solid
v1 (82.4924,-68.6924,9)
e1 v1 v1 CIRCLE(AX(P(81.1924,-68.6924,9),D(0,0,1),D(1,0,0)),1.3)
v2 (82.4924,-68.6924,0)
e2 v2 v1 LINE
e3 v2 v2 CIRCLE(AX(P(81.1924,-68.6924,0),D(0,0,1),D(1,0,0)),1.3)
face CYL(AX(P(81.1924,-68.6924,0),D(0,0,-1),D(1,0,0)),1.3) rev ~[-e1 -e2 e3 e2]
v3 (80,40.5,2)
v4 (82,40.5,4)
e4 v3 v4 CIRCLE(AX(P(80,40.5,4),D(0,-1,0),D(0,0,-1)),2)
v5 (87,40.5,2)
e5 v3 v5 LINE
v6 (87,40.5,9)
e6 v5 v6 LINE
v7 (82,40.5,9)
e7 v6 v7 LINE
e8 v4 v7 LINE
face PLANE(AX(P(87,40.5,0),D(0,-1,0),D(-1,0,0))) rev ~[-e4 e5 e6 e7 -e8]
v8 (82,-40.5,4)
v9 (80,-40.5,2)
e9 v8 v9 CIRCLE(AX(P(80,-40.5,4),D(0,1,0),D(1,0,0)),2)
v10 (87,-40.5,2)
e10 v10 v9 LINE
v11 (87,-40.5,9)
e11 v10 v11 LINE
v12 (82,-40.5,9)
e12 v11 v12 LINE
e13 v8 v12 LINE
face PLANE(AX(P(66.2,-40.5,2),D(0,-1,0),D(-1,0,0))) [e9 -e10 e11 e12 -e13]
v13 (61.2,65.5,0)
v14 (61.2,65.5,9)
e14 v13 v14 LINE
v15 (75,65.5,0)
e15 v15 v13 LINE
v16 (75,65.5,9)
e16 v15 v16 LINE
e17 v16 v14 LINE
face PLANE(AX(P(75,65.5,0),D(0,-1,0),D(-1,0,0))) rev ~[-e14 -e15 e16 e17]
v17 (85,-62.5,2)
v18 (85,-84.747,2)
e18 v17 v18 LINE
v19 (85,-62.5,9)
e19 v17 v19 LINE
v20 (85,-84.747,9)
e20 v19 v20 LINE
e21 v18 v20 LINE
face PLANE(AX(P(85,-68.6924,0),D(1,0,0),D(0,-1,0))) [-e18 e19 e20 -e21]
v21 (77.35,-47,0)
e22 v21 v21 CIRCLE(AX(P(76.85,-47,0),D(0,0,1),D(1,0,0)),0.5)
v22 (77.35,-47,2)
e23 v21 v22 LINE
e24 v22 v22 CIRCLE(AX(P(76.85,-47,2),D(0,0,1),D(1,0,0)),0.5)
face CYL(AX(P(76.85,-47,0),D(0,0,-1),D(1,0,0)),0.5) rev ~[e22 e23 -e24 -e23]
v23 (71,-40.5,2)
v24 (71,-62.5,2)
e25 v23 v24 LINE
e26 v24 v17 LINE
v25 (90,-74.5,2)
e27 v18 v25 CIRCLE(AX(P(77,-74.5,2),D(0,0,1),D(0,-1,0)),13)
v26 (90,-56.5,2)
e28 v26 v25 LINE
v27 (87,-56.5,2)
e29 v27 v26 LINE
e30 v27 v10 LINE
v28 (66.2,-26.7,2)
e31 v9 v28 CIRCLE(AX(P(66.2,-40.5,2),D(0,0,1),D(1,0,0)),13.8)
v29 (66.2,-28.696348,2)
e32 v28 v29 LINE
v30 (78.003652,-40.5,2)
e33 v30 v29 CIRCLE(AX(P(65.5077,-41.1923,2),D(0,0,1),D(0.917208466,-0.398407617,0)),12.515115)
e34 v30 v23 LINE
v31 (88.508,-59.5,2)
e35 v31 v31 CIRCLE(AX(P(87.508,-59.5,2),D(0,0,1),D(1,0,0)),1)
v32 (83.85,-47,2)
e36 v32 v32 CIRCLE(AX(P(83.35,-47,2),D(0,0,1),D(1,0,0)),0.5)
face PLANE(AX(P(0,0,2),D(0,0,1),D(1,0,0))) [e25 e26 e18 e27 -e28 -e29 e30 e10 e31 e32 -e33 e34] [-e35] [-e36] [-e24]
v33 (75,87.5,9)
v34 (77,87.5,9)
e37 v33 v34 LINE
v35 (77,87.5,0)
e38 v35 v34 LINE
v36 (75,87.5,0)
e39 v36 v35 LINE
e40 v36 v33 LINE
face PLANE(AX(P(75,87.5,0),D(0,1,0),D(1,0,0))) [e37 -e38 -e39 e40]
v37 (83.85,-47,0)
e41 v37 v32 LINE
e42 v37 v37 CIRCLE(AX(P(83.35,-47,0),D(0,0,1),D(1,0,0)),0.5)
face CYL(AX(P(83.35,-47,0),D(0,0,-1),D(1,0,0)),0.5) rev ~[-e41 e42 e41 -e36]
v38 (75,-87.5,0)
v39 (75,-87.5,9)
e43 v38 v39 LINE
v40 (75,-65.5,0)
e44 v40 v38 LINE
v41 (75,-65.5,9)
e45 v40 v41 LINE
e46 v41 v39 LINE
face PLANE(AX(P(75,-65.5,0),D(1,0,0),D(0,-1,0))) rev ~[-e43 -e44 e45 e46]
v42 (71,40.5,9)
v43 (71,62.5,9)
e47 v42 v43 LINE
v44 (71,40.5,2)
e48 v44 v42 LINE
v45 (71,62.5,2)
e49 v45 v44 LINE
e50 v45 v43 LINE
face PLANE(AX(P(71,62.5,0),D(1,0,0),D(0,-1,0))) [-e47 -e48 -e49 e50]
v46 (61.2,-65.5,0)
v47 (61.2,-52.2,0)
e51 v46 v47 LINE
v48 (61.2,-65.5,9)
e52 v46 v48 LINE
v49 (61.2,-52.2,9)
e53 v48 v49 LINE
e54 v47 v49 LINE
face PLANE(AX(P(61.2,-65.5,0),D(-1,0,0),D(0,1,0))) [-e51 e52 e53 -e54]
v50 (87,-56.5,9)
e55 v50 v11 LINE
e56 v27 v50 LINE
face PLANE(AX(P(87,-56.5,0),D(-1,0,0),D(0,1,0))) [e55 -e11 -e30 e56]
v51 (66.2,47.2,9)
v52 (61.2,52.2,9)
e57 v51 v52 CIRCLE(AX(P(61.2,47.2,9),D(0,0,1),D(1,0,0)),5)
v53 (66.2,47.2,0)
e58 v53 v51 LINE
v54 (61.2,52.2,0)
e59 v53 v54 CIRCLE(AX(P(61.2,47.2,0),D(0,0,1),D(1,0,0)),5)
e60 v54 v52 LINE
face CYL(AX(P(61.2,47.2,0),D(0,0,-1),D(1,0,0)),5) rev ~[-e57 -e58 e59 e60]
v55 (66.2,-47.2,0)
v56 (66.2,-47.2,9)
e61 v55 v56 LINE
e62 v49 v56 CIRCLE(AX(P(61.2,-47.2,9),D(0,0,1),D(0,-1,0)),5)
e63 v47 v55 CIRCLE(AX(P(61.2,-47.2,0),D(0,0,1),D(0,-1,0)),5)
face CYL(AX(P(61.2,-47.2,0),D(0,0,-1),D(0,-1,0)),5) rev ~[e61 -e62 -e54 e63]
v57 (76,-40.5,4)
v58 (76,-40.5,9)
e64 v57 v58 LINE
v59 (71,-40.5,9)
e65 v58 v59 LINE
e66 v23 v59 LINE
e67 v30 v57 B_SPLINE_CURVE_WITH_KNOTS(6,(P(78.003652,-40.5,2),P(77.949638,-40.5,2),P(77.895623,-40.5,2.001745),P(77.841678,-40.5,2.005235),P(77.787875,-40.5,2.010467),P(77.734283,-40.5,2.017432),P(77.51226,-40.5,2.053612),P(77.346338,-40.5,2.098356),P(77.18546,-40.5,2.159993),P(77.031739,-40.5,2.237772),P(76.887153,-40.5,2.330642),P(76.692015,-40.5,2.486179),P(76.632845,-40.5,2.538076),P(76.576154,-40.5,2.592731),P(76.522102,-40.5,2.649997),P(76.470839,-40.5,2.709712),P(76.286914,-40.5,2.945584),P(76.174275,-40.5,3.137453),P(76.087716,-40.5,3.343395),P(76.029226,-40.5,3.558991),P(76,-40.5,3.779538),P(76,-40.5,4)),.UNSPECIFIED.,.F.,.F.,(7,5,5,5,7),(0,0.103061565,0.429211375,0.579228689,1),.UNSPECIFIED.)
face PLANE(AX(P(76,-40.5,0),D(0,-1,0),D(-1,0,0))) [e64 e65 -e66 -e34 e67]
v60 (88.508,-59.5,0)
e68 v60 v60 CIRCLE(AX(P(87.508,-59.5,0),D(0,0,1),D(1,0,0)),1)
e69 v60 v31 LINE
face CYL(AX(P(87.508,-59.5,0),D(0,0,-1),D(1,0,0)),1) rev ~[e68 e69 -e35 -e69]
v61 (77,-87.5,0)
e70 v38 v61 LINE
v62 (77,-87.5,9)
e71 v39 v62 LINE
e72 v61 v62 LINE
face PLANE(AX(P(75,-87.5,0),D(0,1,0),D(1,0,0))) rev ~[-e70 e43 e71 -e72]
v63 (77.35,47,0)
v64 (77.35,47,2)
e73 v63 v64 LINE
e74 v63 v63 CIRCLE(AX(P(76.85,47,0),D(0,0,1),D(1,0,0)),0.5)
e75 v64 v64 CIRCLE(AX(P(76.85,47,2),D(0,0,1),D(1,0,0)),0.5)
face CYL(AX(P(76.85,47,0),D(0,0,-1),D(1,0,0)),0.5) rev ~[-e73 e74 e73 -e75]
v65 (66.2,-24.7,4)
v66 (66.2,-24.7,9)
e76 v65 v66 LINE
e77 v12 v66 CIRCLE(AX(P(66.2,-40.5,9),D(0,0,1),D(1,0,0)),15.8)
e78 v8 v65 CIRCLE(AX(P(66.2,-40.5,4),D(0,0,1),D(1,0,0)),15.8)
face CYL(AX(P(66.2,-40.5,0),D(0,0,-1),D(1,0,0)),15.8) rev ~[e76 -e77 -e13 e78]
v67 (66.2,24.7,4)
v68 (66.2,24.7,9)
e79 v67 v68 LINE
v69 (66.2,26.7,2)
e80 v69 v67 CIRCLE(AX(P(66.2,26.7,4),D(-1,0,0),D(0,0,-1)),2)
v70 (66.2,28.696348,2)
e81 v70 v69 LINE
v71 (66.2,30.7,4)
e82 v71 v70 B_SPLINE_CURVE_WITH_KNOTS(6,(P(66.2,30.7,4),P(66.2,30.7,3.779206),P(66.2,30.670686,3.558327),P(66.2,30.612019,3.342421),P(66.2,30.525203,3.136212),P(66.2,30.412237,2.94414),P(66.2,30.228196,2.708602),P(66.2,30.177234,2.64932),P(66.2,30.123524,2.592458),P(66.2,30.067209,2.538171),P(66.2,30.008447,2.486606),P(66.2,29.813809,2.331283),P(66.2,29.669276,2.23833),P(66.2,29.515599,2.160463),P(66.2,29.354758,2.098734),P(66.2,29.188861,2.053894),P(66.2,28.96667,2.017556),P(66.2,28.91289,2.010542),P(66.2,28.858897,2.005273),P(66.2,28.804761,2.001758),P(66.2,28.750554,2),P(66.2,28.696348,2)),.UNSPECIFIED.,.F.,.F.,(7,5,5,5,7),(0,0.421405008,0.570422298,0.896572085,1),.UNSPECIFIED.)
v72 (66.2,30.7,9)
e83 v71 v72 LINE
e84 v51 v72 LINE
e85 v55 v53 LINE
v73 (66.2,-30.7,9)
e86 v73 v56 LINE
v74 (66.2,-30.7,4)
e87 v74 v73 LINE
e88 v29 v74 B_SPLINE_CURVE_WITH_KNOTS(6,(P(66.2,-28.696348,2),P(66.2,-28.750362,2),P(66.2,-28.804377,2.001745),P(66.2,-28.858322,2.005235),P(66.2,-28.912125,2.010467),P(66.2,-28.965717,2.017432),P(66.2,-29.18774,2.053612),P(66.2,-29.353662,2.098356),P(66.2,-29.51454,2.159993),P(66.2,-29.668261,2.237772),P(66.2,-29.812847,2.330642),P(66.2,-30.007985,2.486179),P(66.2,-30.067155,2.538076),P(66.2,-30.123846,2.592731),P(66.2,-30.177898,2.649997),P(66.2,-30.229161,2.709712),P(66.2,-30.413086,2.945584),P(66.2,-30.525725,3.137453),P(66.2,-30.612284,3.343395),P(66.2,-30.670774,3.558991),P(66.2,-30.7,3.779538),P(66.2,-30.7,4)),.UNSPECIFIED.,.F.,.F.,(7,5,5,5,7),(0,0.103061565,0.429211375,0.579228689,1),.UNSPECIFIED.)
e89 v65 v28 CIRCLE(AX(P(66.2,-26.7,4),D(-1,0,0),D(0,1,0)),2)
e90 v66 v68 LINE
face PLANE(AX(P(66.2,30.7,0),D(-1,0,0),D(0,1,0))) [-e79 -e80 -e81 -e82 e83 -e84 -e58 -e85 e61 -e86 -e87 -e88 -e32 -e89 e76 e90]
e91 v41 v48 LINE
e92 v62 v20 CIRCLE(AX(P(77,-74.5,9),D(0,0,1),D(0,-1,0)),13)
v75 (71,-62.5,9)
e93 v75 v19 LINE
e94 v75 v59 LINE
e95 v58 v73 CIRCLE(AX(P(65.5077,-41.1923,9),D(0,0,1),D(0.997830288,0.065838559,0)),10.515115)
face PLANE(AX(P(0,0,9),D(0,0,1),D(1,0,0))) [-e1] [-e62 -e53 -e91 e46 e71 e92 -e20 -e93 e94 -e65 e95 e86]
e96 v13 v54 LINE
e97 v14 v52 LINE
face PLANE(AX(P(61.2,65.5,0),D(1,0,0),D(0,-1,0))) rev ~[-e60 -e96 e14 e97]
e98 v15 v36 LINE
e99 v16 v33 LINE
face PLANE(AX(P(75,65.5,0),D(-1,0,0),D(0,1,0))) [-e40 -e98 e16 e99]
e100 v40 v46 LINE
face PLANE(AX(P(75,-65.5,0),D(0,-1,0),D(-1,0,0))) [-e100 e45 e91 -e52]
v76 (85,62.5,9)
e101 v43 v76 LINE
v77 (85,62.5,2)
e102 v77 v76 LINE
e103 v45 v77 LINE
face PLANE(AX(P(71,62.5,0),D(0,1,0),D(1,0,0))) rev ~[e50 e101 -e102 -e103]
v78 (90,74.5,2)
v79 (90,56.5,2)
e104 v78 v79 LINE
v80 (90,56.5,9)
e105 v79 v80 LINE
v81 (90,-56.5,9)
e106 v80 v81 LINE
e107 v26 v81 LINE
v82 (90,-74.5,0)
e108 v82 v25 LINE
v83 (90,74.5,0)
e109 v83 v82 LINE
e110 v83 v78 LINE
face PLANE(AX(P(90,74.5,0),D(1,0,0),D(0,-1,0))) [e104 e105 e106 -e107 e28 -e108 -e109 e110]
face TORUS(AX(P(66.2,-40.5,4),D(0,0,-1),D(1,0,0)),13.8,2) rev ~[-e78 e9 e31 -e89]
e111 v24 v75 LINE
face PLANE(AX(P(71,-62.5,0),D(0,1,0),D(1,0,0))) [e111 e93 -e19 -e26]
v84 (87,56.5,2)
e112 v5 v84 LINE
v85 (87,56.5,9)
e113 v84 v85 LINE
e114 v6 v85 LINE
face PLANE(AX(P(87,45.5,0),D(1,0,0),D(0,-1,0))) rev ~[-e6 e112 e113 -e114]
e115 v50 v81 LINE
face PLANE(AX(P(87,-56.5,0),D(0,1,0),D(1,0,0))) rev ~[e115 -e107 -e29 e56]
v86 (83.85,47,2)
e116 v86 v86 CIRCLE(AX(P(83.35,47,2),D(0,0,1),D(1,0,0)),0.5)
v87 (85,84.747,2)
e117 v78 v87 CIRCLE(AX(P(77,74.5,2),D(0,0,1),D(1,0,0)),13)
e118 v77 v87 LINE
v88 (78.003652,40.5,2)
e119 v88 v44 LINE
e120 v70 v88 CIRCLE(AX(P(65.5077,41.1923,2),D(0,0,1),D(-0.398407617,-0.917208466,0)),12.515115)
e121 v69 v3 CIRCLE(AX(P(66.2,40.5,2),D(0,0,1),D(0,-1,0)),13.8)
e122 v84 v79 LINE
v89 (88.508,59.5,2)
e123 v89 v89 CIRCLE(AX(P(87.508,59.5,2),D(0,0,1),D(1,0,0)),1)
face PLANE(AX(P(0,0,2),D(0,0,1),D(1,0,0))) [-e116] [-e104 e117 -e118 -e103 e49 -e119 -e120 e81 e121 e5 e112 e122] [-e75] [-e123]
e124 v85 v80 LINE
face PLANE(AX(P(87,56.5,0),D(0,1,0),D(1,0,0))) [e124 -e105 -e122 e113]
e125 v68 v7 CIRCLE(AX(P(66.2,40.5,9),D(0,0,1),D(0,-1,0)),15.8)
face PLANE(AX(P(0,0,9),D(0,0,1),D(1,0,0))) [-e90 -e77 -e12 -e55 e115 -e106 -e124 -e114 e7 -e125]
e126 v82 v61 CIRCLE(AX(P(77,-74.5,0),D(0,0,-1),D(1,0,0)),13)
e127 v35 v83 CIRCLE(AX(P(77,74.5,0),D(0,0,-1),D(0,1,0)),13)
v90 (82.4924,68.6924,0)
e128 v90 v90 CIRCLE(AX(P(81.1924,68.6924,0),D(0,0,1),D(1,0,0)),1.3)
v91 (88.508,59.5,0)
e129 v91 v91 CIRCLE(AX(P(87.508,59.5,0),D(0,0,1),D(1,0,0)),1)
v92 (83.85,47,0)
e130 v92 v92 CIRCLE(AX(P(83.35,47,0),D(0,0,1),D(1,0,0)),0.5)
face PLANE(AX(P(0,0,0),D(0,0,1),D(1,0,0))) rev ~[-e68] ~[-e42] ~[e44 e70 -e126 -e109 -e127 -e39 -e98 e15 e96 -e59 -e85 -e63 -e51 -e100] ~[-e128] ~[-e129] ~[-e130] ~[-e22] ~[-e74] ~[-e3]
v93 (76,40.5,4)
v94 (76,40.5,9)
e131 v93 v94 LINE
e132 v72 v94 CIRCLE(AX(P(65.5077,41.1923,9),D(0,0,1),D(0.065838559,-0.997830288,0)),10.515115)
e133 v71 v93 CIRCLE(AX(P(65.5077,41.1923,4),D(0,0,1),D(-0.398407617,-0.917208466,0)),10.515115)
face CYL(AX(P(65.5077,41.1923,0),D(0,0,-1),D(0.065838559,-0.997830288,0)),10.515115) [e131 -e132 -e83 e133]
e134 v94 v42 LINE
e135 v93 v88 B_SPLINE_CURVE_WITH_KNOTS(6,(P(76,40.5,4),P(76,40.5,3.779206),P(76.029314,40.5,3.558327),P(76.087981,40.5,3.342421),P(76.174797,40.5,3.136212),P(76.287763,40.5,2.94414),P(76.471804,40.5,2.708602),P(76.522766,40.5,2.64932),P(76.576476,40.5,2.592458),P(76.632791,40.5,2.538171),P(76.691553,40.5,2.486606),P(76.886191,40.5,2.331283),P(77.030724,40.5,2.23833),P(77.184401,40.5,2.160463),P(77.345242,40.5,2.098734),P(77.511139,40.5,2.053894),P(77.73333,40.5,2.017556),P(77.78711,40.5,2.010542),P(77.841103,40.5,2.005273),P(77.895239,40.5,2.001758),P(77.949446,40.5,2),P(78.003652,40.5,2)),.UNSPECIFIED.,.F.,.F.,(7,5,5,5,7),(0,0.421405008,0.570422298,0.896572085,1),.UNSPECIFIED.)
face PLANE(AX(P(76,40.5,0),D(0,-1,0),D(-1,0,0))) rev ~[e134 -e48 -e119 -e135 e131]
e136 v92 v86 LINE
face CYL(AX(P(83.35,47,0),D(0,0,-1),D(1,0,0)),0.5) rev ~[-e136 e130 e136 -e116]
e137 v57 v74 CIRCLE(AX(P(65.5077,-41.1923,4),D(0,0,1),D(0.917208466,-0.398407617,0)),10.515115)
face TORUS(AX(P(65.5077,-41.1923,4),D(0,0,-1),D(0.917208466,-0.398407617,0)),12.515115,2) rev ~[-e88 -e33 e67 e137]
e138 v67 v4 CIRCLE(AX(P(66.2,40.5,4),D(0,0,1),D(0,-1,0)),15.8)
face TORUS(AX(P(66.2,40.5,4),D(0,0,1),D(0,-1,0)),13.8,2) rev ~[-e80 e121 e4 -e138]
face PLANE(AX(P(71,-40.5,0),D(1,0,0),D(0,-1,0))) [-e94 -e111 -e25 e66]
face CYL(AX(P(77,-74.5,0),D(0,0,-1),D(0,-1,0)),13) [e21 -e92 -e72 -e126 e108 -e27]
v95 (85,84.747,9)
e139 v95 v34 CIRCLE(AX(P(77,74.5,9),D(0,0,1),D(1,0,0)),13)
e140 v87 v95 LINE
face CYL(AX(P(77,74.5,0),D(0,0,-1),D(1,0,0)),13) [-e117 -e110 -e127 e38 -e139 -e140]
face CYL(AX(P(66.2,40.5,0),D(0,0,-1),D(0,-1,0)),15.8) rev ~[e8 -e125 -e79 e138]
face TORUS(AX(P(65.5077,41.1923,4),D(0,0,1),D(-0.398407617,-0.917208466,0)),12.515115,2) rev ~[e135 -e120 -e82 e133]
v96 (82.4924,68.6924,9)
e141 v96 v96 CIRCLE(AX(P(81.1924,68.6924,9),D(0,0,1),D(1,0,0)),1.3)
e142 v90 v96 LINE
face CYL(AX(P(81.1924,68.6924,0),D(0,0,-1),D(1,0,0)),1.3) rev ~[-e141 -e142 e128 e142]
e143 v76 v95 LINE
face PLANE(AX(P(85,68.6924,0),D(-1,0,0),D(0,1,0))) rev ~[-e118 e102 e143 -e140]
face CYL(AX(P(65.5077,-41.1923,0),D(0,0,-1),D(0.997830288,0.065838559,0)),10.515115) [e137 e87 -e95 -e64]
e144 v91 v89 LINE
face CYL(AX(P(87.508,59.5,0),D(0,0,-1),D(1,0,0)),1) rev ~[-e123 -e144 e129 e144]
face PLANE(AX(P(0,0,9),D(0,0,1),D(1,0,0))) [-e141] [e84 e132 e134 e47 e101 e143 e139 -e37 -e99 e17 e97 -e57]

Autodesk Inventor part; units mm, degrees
ref_plane "YZ Plane" through (0, 0, 0) normal (1, 0, 0) x (0, 1, 0)
ref_plane "XZ Plane" through (0, 0, 0) normal (0, 1, 0) x (-1, 0, 0)
ref_plane "XY Plane" through (0, 0, 0) normal (0, 0, 1) x (1, 0, 0)
sketch "Эскиз1" plane through (0, 0, 0) normal (0, 0, 1) x (1, 0, 0)
  line L0 (117.5766, 0) -> (-136.0871, 0) construction
  line L1 (0, 117.7947) -> (0, -152.0118) construction
  line L2 (0, 0) -> (90, 0) construction
  line L3 (65.2, 57.2) -> (61.2, 57.2) construction
  line L4 (65.2, 57.2) -> (65.2, 52.2) construction
  line L5 (75, 65.5) -> (75, 87.5)
  line L6 (75, 87.5) -> (77, 87.5)
  arc A0 (90, 74.5) -> (77, 87.5) centre (77, 74.5) ccw
  line L7 (90, 74.5) -> (90, 0)
  circle A1 centre (65.2, 57.2) radius 2.1
  circle A2 centre (81.1924, 78.6924) radius 2.1
  line L8 (90, 63.5) -> (90, 65.5)
  line L9 (75, 65.5) -> (61.2, 65.5)
  line L10 (66.2, 29.1) -> (66.2, 36.5)
  line L11 (66.2, 24.1) -> (66.2, 0)
  line L12 (66.2, 29.1) -> (66.2, 24.1)
  line L13 (71, 62.5) -> (71, 45.5)
  line L14 (71, 45.5) -> (71, 56.5)
  line L15 (87, 56.5) -> (87, 45.5)
  line L16 (87, 45.5) -> (74.2, 45.5)
  line L17 (74.2, 45.5) -> (74.2, 56.5)
  line L18 (74.2, 56.5) -> (87, 56.5)
  line L19 (87, 56.5) -> (87, 45.5)
  line L20 (87, 45.5) -> (87, 40.5)
  line L21 (87, 40.5) -> (71, 40.5)
  line L22 (71, 40.5) -> (71, 45.5)
  line L23 (87, 40.5) -> (79, 40.5)
  arc A3 (66.2, 24.7) -> (82, 40.5) centre (66.2, 40.5) ccw
  arc A4 (66.2, 30.7) -> (76, 40.5) centre (65.5077, 41.1923) ccw
  line L24 (80.6, 45.5) -> (83.35, 45.5)
  line L25 (83.35, 45.5) -> (76.85, 45.5)
  line L26 (74.2, 45.5) -> (73.7, 45.5)
  circle A5 centre (76.85, 47) radius 0.5
  circle A6 centre (83.35, 47) radius 0.5
  line L27 (87, 45.5) -> (87, 55.9)
  line L28 (65.2, -57.2) -> (61.2, -57.2) construction
  line L29 (65.2, -57.2) -> (65.2, -52.2) construction
  line L30 (75, -65.5) -> (75, -87.5)
  line L31 (75, -87.5) -> (77, -87.5)
  arc A7 (77, -87.5) -> (90, -74.5) centre (77, -74.5) ccw
  line L32 (90, -74.5) -> (90, 0)
  circle A8 centre (65.2, -57.2) radius 2.1
  circle A9 centre (81.1924, -78.6924) radius 2.1
  line L33 (90, -63.5) -> (90, -65.5)
  line L34 (75, -65.5) -> (61.2, -65.5)
  line L35 (71, -62.5) -> (71, -45.5)
  line L36 (71, -45.5) -> (71, -56.5)
  line L37 (87, -56.5) -> (87, -45.5)
  line L38 (87, -45.5) -> (74.2, -45.5)
  line L39 (74.2, -45.5) -> (74.2, -56.5)
  line L40 (74.2, -56.5) -> (87, -56.5)
  line L41 (87, -56.5) -> (87, -45.5)
  line L42 (87, -45.5) -> (87, -40.5)
  line L43 (87, -40.5) -> (71, -40.5)
  line L44 (71, -40.5) -> (71, -45.5)
  line L45 (87, -40.5) -> (79, -40.5)
  arc A10 (82, -40.5) -> (66.2, -24.7) centre (66.2, -40.5) ccw
  arc A11 (76, -40.5) -> (66.2, -30.7) centre (65.5077, -41.1923) ccw
  line L46 (80.6, -45.5) -> (83.35, -45.5)
  line L47 (83.35, -45.5) -> (76.85, -45.5)
  line L48 (74.2, -45.5) -> (73.7, -45.5)
  circle A12 centre (76.85, -47) radius 0.5
  circle A13 centre (83.35, -47) radius 0.5
  line L49 (87, -45.5) -> (87, -55.9)
  line L50 (87, -56.5) -> (90, -56.5)
  circle A14 centre (87.508, -59.5) radius 1
  circle A15 centre (81.1924, 68.6924) radius 1.3
  circle A16 centre (81.1924, -68.6924) radius 1.3
  line L51 (61.2, 65.5) -> (61.2, 52.2)
  arc A17 (66.2, 47.2) -> (61.2, 52.2) centre (61.2, 47.2) ccw
  line L52 (66.2, 47.2) -> (66.2, 36.5)
  line L53 (66.2, -29.1) -> (66.2, -36.5)
  line L54 (66.2, -24.1) -> (66.2, 0)
  line L55 (66.2, -29.1) -> (66.2, -24.1)
  line L56 (61.2, -65.5) -> (61.2, -52.2)
  arc A18 (61.2, -52.2) -> (66.2, -47.2) centre (61.2, -47.2) ccw
  line L57 (66.2, -47.2) -> (66.2, -36.5)
  line L58 (85, -68.6924) -> (85, -84.747)
  line L59 (71, -62.5) -> (85, -62.5)
  line L60 (85, -62.5) -> (85, -68.6924)
  circle A19 centre (87.508, 59.5) radius 1
  line L61 (85, 68.6924) -> (85, 84.747)
  line L62 (71, 62.5) -> (85, 62.5)
  line L63 (85, 62.5) -> (85, 68.6924)
  line L64 (87, 56.5) -> (90, 56.5)
  point P0 (60.2, 65.5)
  point P1 (74.2, 55.9)
  point P2 (87, 82.8066)
  point P3 (60.2, -65.5)
  point P4 (74.2, -55.9)
  point P5 (87, -82.8066)
  point P6 (81.1924, 67.6924)
  point P7 (81.1924, -67.6924)
  point P8 (87.75, -59.5)
  dimension "d6" = 90
  dimension "d11" = 4
  dimension "d12" = 5
  dimension "d14" = 13
  dimension "d20" = 4.2
  dimension "d64" = 7.4
  dimension "d76" = 16
  dimension "d77" = 17
  dimension "d78" = 11
  dimension "d79" = 12.8
  dimension "d80" = 5
  dimension "d81" = 8
  dimension "d88" = 0.5
  dimension "d92" = 10.4
  dimension "d105" = 2.6
  dimension "d122" = 1
  dimension "d123" = 1
  dimension "d124" = 1
extrude "Выдавливание13" add sketch "Эскиз1" along normal blind 9 contours L5 L6 A0 L61 L63 L62 L13 L22 L21 A4 L10 L52 A17 L51 L9 | L7 L32 L50 L37 L42 L43 A10 L55 L54 L11 L12 A3 L21 L20 L15 L64 | A7 L31 L30 L34 L56 A18 L57 L53 A11 L43 L44 L35 L59 L60 L58 | A1 | A2 | A8 | A9
extrude "Выдавливание16" add sketch "Эскиз1" along normal blind 2 contours A0 L7 L64 L18 L17 L16 L20 L21 L22 L13 L62 L63 L61 | A4 L21 A3 L12 L10 | L15 L16 L17 L18 | L32 A7 L58 L60 L59 L35 L44 L43 L42 L38 L39 L40 L50 | L40 L39 L38 L37 | A10 L43 A11 L53 L55
fillet "Сопряжение3" radius 2 4 edges at (72.943, -33.757, 2) (77.3723, -29.3277, 2) (77.3723, 29.3277, 2) (72.943, 33.757, 2)
properties part number "front_part"
